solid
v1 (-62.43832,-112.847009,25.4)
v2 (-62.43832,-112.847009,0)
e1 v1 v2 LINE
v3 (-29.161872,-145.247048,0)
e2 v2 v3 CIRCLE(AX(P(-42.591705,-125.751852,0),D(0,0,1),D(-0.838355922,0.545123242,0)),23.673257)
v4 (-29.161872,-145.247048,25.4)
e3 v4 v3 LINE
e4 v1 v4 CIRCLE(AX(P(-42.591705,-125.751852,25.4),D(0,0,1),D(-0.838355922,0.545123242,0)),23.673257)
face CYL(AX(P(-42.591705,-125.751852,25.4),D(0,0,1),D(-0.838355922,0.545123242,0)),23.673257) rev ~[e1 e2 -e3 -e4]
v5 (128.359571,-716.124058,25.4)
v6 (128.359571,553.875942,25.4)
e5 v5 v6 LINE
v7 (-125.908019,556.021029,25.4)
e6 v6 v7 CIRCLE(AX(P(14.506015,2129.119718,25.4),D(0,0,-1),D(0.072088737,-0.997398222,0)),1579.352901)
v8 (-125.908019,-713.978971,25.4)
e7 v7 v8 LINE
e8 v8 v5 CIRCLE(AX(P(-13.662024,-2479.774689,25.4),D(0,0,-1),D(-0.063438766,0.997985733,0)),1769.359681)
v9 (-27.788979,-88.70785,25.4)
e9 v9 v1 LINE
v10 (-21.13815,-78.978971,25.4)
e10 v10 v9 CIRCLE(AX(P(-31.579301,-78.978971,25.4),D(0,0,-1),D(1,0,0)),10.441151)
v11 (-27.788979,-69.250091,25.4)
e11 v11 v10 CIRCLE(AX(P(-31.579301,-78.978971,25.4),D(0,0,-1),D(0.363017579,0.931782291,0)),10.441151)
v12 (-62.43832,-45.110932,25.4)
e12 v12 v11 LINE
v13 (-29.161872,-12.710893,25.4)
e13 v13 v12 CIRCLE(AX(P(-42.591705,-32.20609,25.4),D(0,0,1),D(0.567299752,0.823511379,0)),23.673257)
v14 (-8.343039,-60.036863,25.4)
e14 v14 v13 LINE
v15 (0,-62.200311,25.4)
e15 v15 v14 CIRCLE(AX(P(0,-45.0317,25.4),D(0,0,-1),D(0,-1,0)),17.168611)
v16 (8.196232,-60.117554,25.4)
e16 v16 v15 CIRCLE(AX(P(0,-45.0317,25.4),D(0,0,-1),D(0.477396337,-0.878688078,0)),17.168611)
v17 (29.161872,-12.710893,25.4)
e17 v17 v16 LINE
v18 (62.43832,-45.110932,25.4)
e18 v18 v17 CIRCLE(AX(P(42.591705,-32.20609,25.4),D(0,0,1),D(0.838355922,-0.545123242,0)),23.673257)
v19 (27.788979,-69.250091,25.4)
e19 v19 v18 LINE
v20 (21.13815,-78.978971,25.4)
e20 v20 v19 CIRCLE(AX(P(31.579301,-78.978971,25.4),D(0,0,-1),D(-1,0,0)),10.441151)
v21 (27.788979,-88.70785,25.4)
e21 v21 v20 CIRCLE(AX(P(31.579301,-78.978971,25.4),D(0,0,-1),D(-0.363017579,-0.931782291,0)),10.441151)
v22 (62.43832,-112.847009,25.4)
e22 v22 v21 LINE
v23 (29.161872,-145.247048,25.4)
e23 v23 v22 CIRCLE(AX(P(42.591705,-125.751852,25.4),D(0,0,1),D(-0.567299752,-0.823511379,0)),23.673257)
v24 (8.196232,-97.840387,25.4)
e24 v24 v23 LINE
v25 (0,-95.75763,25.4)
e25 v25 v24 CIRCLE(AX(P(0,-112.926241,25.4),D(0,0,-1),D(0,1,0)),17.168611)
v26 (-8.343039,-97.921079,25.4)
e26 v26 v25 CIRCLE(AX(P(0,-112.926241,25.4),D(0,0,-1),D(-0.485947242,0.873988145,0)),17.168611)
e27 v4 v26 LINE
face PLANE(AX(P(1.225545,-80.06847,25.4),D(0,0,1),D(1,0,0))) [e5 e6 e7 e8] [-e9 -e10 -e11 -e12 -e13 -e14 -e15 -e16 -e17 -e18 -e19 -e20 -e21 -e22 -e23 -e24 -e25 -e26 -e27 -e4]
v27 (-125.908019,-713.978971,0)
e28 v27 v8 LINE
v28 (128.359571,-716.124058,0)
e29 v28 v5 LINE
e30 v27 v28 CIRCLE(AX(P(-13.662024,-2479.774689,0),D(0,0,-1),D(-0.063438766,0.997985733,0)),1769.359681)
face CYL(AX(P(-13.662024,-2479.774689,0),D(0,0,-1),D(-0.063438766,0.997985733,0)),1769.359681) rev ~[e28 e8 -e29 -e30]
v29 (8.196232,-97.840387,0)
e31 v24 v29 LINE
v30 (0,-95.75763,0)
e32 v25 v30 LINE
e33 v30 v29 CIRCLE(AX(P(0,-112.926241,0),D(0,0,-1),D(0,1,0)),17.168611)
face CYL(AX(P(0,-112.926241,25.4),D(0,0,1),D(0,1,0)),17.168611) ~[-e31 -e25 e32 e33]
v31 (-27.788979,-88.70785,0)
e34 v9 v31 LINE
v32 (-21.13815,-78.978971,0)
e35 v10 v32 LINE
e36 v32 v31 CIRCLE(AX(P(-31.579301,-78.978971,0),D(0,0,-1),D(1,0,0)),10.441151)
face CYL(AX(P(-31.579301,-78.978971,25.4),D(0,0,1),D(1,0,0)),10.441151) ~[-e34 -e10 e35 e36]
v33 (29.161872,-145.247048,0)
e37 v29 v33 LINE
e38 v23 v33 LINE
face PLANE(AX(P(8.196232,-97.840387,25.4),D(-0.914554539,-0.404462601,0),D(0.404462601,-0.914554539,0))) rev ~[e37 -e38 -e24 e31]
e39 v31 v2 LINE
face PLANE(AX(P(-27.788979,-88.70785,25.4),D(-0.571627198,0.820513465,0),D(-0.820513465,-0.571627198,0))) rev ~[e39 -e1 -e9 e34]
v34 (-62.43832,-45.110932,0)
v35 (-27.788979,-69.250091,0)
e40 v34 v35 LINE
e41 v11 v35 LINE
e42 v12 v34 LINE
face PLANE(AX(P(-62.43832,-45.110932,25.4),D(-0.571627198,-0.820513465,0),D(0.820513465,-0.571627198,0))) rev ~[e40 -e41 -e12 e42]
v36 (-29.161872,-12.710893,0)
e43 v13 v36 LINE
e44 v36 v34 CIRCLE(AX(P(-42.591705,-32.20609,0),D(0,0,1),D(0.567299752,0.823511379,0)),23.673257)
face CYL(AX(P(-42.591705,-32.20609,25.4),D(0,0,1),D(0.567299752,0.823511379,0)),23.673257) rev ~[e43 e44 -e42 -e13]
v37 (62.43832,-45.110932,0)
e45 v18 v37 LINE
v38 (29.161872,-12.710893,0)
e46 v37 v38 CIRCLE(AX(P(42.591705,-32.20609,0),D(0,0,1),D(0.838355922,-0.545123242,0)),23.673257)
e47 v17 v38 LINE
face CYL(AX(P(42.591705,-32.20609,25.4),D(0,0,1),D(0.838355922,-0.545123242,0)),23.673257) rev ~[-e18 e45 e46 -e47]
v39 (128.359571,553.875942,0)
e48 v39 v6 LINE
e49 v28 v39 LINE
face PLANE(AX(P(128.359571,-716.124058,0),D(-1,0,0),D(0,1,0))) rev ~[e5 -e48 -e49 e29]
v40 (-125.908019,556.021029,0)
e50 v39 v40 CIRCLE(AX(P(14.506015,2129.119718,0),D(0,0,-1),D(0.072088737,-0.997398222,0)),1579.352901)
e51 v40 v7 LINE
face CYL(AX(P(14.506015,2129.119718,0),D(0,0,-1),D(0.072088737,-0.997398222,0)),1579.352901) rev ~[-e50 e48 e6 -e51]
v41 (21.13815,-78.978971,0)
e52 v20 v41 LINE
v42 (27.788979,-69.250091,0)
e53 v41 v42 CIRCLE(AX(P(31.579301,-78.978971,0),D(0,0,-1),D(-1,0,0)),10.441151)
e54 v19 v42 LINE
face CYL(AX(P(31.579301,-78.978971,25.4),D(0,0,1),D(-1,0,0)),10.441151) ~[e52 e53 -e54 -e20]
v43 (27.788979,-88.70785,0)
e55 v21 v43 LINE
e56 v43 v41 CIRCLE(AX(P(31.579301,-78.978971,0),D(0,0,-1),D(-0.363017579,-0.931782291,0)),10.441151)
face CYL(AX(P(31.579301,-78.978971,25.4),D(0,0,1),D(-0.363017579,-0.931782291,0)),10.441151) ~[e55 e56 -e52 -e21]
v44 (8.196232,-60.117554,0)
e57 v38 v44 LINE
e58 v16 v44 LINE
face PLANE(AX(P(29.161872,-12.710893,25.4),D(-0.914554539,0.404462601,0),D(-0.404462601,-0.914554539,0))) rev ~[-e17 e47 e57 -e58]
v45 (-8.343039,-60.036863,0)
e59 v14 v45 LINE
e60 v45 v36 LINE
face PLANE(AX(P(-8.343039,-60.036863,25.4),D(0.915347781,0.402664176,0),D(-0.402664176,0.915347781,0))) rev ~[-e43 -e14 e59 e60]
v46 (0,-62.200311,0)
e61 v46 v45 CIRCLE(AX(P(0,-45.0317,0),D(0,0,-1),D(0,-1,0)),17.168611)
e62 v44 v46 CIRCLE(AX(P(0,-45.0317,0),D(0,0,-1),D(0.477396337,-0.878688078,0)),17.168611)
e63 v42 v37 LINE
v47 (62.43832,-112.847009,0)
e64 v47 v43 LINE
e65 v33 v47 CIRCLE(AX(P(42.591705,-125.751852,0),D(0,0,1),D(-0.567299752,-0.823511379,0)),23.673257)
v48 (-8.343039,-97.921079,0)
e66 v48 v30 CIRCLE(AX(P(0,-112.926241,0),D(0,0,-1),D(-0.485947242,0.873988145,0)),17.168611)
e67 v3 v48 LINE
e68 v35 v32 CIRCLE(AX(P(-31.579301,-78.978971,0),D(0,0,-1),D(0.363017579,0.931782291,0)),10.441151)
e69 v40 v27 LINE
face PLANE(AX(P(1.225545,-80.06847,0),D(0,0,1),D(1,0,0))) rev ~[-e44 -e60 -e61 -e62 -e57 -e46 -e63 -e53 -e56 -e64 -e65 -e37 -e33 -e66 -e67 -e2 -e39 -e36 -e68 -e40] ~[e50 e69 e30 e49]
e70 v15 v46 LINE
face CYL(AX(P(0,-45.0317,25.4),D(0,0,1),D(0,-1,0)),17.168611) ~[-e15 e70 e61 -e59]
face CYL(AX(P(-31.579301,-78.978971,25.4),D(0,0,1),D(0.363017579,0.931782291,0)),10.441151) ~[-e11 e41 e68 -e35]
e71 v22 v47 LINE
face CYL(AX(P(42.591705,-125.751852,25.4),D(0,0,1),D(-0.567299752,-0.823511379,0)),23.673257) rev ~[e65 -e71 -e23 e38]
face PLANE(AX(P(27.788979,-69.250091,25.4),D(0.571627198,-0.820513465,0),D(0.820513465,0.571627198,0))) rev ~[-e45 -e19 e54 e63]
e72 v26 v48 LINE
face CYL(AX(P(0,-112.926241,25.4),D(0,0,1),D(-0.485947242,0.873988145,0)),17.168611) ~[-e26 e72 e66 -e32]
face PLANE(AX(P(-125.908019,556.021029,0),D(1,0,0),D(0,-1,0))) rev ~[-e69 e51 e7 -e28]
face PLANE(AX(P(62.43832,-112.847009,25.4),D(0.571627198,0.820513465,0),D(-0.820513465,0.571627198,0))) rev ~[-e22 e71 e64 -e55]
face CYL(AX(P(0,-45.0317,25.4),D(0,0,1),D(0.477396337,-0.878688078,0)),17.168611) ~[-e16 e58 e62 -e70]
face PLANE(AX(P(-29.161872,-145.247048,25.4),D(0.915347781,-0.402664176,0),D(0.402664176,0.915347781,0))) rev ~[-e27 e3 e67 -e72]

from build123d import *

# Parameters (mm, degrees)
F1_DEPTH = 25.4
F3_DEPTH = 25.4
F4_DEPTH = 25.4


# Not quite as in the source:
# - a feature names something its author has since deleted; it is built from what else it names


with BuildPart() as f1:
    # F0 (on Top) → F1 (new body)
    with BuildSketch(Plane.XY):
        with BuildLine():
            ThreePointArc((128.3595710993, 553.8759422302), (1.1825358552, 549.8230168828), (-125.9080190212, 556.0210293531))
            Line((-125.9080190212, 556.0210293531), (-125.9080190212, -713.9789706469))
            ThreePointArc((-125.9080190212, -713.9789706469), (1.2643600135, -710.4779684085), (128.3595710993, -716.1240577698))
            Line((128.3595710993, -716.1240577698), (128.3595710993, 553.8759422302))
        make_face()
    extrude(amount=F1_DEPTH)

    # F2 (on face) → F3 (cut, through all)
    with BuildSketch(Plane.XY.offset(25.4)):
        with BuildLine():
            Line((21.1381499791, -78.9789706469), (0, -78.9789706469))
            Line((0, -78.9789706469), (0, -95.7576301918))
            ThreePointArc((0, -95.7576301918), (4.2283594629, -96.2864641581), (8.1962319091, -97.8403873742))
            Line((8.1962319091, -97.8403873742), (29.1618719602, -145.247048063))
            ThreePointArc((29.1618719602, -145.247048063), (59.1063769686, -142.7132397651), (62.4383196322, -112.8470092903))
            Line((62.4383196322, -112.8470092903), (27.7889794812, -88.7078500401))
            ThreePointArc((27.7889794812, -88.7078500401), (22.9597605864, -84.8714367544), (21.1381499791, -78.9789706469))
        make_face()
        with BuildLine():
            Line((0, -78.9789706469), (-21.1381499791, -78.9789706469))
            ThreePointArc((-21.1381499791, -78.9789706469), (-22.9597605864, -84.8714367544), (-27.7889794812, -88.7078500401))
            Line((-27.7889794812, -88.7078500401), (-62.4383196322, -112.8470092903))
            ThreePointArc((-62.4383196322, -112.8470092903), (-59.1063769686, -142.7132397651), (-29.1618719602, -145.247048063))
            Line((-29.1618719602, -145.247048063), (-8.3430390852, -97.9210786899))
            ThreePointArc((-8.3430390852, -97.9210786899), (-4.3094898358, -96.30729114), (0, -95.7576301918))
            Line((0, -95.7576301918), (0, -78.9789706469))
        make_face()
    extrude(amount=-F3_DEPTH, mode=Mode.SUBTRACT)

    # F2 (on face) → F4 (cut, through all)
    with BuildSketch(Plane.XY.offset(25.4)):
        with BuildLine():
            ThreePointArc((-27.7889794812, -69.2500912536), (-22.9597605864, -73.0865045393), (-21.1381499791, -78.9789706469))
            Line((-21.1381499791, -78.9789706469), (0, -78.9789706469))
            Line((0, -78.9789706469), (0, -62.2003111019))
            ThreePointArc((0, -62.2003111019), (-4.3094898358, -61.6506501538), (-8.3430390852, -60.0368626038))
            Line((-8.3430390852, -60.0368626038), (-29.1618719602, -12.7108932307))
            ThreePointArc((-29.1618719602, -12.7108932307), (-59.1063769686, -15.2447015287), (-62.4383196322, -45.1109320034))
            Line((-62.4383196322, -45.1109320034), (-27.7889794812, -69.2500912536))
        make_face()
        with BuildLine():
            Line((0, -62.2003111019), (0, -78.9789706469))
            Line((0, -78.9789706469), (21.1381499791, -78.9789706469))
            ThreePointArc((21.1381499791, -78.9789706469), (22.9597605864, -73.0865045393), (27.7889794812, -69.2500912536))
            Line((27.7889794812, -69.2500912536), (62.4383196322, -45.1109320034))
            ThreePointArc((62.4383196322, -45.1109320034), (59.1063769686, -15.2447015287), (29.1618719602, -12.7108932307))
            Line((29.1618719602, -12.7108932307), (8.1962319091, -60.1175539196))
            ThreePointArc((8.1962319091, -60.1175539196), (4.2283594629, -61.6714771356), (0, -62.2003111019))
        make_face()
    extrude(amount=-F4_DEPTH, mode=Mode.SUBTRACT)


solid = f1.part
